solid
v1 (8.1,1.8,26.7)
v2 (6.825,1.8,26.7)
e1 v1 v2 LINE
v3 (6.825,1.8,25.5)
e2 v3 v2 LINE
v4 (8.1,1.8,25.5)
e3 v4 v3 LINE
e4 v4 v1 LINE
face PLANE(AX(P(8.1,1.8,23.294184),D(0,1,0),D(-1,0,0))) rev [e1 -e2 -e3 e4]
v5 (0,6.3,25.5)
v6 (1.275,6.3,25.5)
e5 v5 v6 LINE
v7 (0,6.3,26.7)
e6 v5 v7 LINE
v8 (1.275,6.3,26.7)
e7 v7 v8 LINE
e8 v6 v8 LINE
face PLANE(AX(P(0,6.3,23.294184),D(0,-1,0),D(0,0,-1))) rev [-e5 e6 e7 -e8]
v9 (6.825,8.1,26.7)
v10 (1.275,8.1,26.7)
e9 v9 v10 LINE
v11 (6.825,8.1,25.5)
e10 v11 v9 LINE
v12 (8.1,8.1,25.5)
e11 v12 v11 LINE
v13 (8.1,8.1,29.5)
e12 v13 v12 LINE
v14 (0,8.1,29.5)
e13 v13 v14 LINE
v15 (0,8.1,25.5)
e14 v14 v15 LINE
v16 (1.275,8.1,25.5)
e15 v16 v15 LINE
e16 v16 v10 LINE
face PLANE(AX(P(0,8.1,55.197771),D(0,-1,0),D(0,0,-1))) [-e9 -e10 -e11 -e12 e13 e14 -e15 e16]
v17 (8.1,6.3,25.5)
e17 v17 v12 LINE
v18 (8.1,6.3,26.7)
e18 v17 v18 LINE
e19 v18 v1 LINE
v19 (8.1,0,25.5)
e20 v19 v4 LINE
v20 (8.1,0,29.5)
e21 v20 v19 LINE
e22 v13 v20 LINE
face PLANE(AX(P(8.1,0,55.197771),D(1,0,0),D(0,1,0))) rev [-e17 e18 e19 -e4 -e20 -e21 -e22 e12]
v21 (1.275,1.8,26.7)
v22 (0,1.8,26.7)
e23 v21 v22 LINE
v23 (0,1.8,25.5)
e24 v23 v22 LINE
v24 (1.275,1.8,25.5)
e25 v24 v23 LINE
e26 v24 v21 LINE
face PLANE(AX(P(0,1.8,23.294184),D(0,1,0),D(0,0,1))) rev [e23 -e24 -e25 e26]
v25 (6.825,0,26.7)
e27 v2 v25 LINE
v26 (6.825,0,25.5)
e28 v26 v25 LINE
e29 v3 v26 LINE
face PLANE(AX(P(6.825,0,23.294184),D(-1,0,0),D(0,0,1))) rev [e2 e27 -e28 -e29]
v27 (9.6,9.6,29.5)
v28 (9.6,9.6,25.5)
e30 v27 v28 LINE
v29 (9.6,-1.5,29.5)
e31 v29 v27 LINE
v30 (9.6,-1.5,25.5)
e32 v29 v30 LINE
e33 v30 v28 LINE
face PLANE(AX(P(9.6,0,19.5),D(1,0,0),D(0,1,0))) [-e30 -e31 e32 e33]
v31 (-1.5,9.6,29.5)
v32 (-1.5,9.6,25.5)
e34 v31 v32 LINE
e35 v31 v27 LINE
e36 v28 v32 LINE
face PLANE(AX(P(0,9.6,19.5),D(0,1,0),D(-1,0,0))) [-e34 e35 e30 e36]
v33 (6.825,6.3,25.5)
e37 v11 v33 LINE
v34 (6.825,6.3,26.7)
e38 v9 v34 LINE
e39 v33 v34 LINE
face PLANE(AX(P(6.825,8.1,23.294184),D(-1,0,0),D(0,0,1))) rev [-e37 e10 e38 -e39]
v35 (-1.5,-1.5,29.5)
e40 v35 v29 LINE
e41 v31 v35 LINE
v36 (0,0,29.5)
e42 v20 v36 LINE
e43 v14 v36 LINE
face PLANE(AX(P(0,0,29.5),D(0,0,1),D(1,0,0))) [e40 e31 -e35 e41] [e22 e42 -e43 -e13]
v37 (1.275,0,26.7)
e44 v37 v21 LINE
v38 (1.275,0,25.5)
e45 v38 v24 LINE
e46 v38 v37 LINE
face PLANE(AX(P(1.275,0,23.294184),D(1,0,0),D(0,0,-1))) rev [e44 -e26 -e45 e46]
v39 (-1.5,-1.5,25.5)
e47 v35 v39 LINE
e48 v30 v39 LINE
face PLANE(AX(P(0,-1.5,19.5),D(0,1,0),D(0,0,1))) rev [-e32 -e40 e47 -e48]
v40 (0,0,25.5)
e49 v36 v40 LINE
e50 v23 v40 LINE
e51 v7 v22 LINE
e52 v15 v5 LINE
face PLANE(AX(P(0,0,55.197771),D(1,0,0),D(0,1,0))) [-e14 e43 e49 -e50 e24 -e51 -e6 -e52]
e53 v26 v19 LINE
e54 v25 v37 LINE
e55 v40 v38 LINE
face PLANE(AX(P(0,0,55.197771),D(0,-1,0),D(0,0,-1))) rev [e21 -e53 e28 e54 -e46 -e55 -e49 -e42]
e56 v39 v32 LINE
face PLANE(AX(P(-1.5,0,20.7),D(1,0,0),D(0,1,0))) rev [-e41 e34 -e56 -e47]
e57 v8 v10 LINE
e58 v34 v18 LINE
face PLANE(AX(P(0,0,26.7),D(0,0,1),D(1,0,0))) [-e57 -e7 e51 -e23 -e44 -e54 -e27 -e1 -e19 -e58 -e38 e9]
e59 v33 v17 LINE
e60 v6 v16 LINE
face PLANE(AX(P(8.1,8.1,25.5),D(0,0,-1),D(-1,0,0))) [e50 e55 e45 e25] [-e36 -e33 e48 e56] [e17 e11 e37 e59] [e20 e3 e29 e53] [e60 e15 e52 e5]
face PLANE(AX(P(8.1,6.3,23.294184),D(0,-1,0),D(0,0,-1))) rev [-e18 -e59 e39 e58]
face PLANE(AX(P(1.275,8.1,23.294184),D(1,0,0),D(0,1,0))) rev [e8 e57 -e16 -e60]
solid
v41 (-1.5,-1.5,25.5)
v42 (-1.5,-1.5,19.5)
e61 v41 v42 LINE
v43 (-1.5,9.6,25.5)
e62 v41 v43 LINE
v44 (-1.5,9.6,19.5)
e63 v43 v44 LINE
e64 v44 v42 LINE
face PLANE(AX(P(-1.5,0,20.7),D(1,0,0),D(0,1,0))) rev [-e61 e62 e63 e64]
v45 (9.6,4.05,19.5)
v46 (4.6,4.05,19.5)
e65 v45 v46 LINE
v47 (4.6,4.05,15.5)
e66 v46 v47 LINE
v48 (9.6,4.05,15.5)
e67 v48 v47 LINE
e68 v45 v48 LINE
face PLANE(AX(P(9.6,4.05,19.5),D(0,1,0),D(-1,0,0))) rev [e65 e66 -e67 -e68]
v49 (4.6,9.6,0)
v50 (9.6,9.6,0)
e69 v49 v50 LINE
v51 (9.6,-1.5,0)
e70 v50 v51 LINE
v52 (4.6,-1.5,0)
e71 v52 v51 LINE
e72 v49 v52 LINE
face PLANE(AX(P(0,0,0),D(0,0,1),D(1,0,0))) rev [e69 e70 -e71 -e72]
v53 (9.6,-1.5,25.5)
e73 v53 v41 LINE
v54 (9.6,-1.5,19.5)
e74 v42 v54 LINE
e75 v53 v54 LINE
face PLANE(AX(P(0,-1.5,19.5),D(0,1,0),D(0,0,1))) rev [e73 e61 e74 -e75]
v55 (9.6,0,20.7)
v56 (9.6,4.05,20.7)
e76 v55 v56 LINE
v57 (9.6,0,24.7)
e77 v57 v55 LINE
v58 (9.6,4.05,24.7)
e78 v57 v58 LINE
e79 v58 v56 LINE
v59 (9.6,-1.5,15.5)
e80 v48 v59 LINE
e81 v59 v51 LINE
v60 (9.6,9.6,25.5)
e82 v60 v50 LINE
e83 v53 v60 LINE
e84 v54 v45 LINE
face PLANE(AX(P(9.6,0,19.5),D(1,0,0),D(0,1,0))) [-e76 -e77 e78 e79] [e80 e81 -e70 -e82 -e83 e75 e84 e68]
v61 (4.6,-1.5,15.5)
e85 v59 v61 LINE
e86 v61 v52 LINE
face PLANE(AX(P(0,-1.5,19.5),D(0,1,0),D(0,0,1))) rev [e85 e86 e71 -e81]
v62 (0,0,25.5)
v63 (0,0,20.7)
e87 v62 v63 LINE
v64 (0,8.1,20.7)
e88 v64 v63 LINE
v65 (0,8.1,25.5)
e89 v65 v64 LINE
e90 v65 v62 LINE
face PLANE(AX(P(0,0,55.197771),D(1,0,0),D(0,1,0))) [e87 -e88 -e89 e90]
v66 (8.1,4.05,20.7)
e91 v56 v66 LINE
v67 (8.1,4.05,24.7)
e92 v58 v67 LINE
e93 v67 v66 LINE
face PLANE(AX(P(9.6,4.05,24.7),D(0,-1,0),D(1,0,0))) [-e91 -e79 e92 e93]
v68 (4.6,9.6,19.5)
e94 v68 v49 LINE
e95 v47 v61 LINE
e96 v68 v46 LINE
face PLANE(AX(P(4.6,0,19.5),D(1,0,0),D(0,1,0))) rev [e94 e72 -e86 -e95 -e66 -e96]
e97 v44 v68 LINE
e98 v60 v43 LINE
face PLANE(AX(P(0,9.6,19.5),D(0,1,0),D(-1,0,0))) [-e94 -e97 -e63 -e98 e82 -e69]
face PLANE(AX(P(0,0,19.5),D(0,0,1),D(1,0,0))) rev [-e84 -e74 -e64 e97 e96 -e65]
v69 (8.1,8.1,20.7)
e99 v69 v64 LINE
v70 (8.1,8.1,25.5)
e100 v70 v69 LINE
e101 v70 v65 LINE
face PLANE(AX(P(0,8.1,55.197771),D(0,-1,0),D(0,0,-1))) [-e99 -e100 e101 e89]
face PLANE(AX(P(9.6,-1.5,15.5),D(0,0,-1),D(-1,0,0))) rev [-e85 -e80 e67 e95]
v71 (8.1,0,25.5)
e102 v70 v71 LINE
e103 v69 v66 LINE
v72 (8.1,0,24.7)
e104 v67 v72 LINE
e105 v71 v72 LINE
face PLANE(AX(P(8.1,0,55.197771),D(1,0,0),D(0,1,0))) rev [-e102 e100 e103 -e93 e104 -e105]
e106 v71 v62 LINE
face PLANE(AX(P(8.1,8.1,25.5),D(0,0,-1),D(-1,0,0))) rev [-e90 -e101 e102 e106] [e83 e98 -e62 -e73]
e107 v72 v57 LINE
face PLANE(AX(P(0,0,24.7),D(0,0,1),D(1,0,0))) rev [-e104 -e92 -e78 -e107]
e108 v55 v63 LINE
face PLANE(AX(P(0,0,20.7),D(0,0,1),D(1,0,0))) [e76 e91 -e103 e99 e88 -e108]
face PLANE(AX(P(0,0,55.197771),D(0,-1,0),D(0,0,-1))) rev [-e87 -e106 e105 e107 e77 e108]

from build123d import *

# Parameters (mm, degrees)
SKETCH2_W           = 3.5
SKETCH2_H           = 8.1
BOSS_EXTRUDE1_DEPTH = 19.5
BOSS_EXTRUDE2_START = 19.5
SKETCH2_3_W         = 0.55
SKETCH2_3_H         = 1.5
SKETCH2_3_W_2       = 3.5
SKETCH2_3_H_2       = 8.1
BOSS_EXTRUDE2_DEPTH = 1.2
BOSS_EXTRUDE3_START = 20.7
BOSS_EXTRUDE3_DEPTH = 8.8
BOSS_EXTRUDE4_START = 26.7
SKETCH2_7_W         = 4.6
SKETCH2_7_H         = 8.1
SKETCH2_7_W_2       = 3.5
BOSS_EXTRUDE4_DEPTH = 1.2
SKETCH4_W           = 1.275
SKETCH4_H           = 1.8
CUT_EXTRUDE1_DEPTH  = 1.2
SKETCH5_W           = 4
SKETCH5_H           = 5.55
CUT_EXTRUDE2_DEPTH  = 32.616767703
SKETCH6_W           = 1.5
SKETCH6_H           = 4.05
CUT_EXTRUDE3_DEPTH  = 4


# Read off the part's stored shape, not the designer's step: Split1
with BuildPart() as part:
    # Sketch2 → Boss-Extrude1 (new body)
    with BuildSketch(Plane.XY):
        Polygon((8.1, 0), (4.6, 0), (4.6, -1.5), (9.6, -1.5), (9.6, 9.6), (4.6, 9.6), (4.6, 8.1), (8.1, 8.1), align=None)
        with Locations((6.35, 4.05)):
            Rectangle(SKETCH2_W, SKETCH2_H)
    extrude(amount=BOSS_EXTRUDE1_DEPTH)

    # Sketch2<3> → Boss-Extrude2 (add)
    with BuildSketch(Plane.XY.offset(BOSS_EXTRUDE2_START)):
        Polygon((4.05, 0), (0, 0), (0, 4.05), (-1.5, 4.05), (-1.5, -1.5), (4.05, -1.5), align=None)
        Polygon((-1.5, 4.05), (0, 4.05), (0, 8.1), (4.6, 8.1), (4.6, 9.6), (-1.5, 9.6), align=None)
        Polygon((0, 4.05), (0, 0), (4.05, 0), (4.6, 0), (4.6, 8.1), (0, 8.1), align=None)
        with Locations((4.325, -0.75)):
            Rectangle(SKETCH2_3_W, SKETCH2_3_H)
        Polygon((8.1, 0), (4.6, 0), (4.6, -1.5), (9.6, -1.5), (9.6, 9.6), (4.6, 9.6), (4.6, 8.1), (8.1, 8.1), align=None)
        with Locations((6.35, 4.05)):
            Rectangle(SKETCH2_3_W_2, SKETCH2_3_H_2)
    extrude(amount=BOSS_EXTRUDE2_DEPTH)

    # Sketch2<5> → Boss-Extrude3 (add)
    with BuildSketch(Plane.XY.offset(BOSS_EXTRUDE3_START)):
        Polygon((4.6, 0), (0, 0), (0, 8.1), (4.6, 8.1), (4.6, 9.6), (-1.5, 9.6), (-1.5, -1.5), (4.6, -1.5), align=None)
        Polygon((8.1, 0), (4.6, 0), (4.6, -1.5), (9.6, -1.5), (9.6, 9.6), (4.6, 9.6), (4.6, 8.1), (8.1, 8.1), align=None)
    extrude(amount=BOSS_EXTRUDE3_DEPTH)

    # Sketch2<7> → Boss-Extrude4 (add)
    with BuildSketch(Plane.XY.offset(BOSS_EXTRUDE4_START)):
        Polygon((4.6, 0), (0, 0), (0, 8.1), (4.6, 8.1), (4.6, 9.6), (-1.5, 9.6), (-1.5, -1.5), (4.6, -1.5), align=None)
        with Locations((2.3, 4.05)):
            Rectangle(SKETCH2_7_W, SKETCH2_7_H)
        Polygon((8.1, 0), (4.6, 0), (4.6, -1.5), (9.6, -1.5), (9.6, 9.6), (4.6, 9.6), (4.6, 8.1), (8.1, 8.1), align=None)
        with Locations((6.35, 4.05)):
            Rectangle(SKETCH2_7_W_2, SKETCH2_7_H)
    extrude(amount=-BOSS_EXTRUDE4_DEPTH)


with BuildPart() as body_2:
    # Split1: the piece on the far side of the plane
    add(part.part)
    split(bisect_by=Plane.XY.offset(25.5), keep=Keep.BOTTOM)

    # Sketch5 → Cut-Extrude2 (cut, through all)
    with BuildSketch(Plane.ZY.offset(-4.6)):
        with Locations((17.5, 1.275)):
            Rectangle(SKETCH5_W, SKETCH5_H)
    extrude(amount=-CUT_EXTRUDE2_DEPTH, mode=Mode.SUBTRACT)

    # Sketch6 → Cut-Extrude3 (cut)
    with BuildSketch(Plane.XY.offset(20.7)):
        with Locations((8.85, 2.025)):
            Rectangle(SKETCH6_W, SKETCH6_H)
    extrude(amount=CUT_EXTRUDE3_DEPTH, mode=Mode.SUBTRACT)


with BuildPart() as part_1:
    add(part.part)

    # Split1
    split(bisect_by=Plane.XY.offset(25.5), keep=Keep.TOP)

    # Sketch4 → Cut-Extrude1 (cut)
    with BuildSketch(Plane.XY.offset(26.7)):
        with Locations((0.6375, 0.9)):
            Rectangle(SKETCH4_W, SKETCH4_H)
        with Locations((7.4625, 0.9)):
            Rectangle(SKETCH4_W, SKETCH4_H)
        with Locations((0.6375, 7.2)):
            Rectangle(SKETCH4_W, SKETCH4_H)
        with Locations((7.4625, 7.2)):
            Rectangle(SKETCH4_W, SKETCH4_H)
    extrude(amount=-CUT_EXTRUDE1_DEPTH, mode=Mode.SUBTRACT)


solid = Compound([body_2.part, part_1.part])
